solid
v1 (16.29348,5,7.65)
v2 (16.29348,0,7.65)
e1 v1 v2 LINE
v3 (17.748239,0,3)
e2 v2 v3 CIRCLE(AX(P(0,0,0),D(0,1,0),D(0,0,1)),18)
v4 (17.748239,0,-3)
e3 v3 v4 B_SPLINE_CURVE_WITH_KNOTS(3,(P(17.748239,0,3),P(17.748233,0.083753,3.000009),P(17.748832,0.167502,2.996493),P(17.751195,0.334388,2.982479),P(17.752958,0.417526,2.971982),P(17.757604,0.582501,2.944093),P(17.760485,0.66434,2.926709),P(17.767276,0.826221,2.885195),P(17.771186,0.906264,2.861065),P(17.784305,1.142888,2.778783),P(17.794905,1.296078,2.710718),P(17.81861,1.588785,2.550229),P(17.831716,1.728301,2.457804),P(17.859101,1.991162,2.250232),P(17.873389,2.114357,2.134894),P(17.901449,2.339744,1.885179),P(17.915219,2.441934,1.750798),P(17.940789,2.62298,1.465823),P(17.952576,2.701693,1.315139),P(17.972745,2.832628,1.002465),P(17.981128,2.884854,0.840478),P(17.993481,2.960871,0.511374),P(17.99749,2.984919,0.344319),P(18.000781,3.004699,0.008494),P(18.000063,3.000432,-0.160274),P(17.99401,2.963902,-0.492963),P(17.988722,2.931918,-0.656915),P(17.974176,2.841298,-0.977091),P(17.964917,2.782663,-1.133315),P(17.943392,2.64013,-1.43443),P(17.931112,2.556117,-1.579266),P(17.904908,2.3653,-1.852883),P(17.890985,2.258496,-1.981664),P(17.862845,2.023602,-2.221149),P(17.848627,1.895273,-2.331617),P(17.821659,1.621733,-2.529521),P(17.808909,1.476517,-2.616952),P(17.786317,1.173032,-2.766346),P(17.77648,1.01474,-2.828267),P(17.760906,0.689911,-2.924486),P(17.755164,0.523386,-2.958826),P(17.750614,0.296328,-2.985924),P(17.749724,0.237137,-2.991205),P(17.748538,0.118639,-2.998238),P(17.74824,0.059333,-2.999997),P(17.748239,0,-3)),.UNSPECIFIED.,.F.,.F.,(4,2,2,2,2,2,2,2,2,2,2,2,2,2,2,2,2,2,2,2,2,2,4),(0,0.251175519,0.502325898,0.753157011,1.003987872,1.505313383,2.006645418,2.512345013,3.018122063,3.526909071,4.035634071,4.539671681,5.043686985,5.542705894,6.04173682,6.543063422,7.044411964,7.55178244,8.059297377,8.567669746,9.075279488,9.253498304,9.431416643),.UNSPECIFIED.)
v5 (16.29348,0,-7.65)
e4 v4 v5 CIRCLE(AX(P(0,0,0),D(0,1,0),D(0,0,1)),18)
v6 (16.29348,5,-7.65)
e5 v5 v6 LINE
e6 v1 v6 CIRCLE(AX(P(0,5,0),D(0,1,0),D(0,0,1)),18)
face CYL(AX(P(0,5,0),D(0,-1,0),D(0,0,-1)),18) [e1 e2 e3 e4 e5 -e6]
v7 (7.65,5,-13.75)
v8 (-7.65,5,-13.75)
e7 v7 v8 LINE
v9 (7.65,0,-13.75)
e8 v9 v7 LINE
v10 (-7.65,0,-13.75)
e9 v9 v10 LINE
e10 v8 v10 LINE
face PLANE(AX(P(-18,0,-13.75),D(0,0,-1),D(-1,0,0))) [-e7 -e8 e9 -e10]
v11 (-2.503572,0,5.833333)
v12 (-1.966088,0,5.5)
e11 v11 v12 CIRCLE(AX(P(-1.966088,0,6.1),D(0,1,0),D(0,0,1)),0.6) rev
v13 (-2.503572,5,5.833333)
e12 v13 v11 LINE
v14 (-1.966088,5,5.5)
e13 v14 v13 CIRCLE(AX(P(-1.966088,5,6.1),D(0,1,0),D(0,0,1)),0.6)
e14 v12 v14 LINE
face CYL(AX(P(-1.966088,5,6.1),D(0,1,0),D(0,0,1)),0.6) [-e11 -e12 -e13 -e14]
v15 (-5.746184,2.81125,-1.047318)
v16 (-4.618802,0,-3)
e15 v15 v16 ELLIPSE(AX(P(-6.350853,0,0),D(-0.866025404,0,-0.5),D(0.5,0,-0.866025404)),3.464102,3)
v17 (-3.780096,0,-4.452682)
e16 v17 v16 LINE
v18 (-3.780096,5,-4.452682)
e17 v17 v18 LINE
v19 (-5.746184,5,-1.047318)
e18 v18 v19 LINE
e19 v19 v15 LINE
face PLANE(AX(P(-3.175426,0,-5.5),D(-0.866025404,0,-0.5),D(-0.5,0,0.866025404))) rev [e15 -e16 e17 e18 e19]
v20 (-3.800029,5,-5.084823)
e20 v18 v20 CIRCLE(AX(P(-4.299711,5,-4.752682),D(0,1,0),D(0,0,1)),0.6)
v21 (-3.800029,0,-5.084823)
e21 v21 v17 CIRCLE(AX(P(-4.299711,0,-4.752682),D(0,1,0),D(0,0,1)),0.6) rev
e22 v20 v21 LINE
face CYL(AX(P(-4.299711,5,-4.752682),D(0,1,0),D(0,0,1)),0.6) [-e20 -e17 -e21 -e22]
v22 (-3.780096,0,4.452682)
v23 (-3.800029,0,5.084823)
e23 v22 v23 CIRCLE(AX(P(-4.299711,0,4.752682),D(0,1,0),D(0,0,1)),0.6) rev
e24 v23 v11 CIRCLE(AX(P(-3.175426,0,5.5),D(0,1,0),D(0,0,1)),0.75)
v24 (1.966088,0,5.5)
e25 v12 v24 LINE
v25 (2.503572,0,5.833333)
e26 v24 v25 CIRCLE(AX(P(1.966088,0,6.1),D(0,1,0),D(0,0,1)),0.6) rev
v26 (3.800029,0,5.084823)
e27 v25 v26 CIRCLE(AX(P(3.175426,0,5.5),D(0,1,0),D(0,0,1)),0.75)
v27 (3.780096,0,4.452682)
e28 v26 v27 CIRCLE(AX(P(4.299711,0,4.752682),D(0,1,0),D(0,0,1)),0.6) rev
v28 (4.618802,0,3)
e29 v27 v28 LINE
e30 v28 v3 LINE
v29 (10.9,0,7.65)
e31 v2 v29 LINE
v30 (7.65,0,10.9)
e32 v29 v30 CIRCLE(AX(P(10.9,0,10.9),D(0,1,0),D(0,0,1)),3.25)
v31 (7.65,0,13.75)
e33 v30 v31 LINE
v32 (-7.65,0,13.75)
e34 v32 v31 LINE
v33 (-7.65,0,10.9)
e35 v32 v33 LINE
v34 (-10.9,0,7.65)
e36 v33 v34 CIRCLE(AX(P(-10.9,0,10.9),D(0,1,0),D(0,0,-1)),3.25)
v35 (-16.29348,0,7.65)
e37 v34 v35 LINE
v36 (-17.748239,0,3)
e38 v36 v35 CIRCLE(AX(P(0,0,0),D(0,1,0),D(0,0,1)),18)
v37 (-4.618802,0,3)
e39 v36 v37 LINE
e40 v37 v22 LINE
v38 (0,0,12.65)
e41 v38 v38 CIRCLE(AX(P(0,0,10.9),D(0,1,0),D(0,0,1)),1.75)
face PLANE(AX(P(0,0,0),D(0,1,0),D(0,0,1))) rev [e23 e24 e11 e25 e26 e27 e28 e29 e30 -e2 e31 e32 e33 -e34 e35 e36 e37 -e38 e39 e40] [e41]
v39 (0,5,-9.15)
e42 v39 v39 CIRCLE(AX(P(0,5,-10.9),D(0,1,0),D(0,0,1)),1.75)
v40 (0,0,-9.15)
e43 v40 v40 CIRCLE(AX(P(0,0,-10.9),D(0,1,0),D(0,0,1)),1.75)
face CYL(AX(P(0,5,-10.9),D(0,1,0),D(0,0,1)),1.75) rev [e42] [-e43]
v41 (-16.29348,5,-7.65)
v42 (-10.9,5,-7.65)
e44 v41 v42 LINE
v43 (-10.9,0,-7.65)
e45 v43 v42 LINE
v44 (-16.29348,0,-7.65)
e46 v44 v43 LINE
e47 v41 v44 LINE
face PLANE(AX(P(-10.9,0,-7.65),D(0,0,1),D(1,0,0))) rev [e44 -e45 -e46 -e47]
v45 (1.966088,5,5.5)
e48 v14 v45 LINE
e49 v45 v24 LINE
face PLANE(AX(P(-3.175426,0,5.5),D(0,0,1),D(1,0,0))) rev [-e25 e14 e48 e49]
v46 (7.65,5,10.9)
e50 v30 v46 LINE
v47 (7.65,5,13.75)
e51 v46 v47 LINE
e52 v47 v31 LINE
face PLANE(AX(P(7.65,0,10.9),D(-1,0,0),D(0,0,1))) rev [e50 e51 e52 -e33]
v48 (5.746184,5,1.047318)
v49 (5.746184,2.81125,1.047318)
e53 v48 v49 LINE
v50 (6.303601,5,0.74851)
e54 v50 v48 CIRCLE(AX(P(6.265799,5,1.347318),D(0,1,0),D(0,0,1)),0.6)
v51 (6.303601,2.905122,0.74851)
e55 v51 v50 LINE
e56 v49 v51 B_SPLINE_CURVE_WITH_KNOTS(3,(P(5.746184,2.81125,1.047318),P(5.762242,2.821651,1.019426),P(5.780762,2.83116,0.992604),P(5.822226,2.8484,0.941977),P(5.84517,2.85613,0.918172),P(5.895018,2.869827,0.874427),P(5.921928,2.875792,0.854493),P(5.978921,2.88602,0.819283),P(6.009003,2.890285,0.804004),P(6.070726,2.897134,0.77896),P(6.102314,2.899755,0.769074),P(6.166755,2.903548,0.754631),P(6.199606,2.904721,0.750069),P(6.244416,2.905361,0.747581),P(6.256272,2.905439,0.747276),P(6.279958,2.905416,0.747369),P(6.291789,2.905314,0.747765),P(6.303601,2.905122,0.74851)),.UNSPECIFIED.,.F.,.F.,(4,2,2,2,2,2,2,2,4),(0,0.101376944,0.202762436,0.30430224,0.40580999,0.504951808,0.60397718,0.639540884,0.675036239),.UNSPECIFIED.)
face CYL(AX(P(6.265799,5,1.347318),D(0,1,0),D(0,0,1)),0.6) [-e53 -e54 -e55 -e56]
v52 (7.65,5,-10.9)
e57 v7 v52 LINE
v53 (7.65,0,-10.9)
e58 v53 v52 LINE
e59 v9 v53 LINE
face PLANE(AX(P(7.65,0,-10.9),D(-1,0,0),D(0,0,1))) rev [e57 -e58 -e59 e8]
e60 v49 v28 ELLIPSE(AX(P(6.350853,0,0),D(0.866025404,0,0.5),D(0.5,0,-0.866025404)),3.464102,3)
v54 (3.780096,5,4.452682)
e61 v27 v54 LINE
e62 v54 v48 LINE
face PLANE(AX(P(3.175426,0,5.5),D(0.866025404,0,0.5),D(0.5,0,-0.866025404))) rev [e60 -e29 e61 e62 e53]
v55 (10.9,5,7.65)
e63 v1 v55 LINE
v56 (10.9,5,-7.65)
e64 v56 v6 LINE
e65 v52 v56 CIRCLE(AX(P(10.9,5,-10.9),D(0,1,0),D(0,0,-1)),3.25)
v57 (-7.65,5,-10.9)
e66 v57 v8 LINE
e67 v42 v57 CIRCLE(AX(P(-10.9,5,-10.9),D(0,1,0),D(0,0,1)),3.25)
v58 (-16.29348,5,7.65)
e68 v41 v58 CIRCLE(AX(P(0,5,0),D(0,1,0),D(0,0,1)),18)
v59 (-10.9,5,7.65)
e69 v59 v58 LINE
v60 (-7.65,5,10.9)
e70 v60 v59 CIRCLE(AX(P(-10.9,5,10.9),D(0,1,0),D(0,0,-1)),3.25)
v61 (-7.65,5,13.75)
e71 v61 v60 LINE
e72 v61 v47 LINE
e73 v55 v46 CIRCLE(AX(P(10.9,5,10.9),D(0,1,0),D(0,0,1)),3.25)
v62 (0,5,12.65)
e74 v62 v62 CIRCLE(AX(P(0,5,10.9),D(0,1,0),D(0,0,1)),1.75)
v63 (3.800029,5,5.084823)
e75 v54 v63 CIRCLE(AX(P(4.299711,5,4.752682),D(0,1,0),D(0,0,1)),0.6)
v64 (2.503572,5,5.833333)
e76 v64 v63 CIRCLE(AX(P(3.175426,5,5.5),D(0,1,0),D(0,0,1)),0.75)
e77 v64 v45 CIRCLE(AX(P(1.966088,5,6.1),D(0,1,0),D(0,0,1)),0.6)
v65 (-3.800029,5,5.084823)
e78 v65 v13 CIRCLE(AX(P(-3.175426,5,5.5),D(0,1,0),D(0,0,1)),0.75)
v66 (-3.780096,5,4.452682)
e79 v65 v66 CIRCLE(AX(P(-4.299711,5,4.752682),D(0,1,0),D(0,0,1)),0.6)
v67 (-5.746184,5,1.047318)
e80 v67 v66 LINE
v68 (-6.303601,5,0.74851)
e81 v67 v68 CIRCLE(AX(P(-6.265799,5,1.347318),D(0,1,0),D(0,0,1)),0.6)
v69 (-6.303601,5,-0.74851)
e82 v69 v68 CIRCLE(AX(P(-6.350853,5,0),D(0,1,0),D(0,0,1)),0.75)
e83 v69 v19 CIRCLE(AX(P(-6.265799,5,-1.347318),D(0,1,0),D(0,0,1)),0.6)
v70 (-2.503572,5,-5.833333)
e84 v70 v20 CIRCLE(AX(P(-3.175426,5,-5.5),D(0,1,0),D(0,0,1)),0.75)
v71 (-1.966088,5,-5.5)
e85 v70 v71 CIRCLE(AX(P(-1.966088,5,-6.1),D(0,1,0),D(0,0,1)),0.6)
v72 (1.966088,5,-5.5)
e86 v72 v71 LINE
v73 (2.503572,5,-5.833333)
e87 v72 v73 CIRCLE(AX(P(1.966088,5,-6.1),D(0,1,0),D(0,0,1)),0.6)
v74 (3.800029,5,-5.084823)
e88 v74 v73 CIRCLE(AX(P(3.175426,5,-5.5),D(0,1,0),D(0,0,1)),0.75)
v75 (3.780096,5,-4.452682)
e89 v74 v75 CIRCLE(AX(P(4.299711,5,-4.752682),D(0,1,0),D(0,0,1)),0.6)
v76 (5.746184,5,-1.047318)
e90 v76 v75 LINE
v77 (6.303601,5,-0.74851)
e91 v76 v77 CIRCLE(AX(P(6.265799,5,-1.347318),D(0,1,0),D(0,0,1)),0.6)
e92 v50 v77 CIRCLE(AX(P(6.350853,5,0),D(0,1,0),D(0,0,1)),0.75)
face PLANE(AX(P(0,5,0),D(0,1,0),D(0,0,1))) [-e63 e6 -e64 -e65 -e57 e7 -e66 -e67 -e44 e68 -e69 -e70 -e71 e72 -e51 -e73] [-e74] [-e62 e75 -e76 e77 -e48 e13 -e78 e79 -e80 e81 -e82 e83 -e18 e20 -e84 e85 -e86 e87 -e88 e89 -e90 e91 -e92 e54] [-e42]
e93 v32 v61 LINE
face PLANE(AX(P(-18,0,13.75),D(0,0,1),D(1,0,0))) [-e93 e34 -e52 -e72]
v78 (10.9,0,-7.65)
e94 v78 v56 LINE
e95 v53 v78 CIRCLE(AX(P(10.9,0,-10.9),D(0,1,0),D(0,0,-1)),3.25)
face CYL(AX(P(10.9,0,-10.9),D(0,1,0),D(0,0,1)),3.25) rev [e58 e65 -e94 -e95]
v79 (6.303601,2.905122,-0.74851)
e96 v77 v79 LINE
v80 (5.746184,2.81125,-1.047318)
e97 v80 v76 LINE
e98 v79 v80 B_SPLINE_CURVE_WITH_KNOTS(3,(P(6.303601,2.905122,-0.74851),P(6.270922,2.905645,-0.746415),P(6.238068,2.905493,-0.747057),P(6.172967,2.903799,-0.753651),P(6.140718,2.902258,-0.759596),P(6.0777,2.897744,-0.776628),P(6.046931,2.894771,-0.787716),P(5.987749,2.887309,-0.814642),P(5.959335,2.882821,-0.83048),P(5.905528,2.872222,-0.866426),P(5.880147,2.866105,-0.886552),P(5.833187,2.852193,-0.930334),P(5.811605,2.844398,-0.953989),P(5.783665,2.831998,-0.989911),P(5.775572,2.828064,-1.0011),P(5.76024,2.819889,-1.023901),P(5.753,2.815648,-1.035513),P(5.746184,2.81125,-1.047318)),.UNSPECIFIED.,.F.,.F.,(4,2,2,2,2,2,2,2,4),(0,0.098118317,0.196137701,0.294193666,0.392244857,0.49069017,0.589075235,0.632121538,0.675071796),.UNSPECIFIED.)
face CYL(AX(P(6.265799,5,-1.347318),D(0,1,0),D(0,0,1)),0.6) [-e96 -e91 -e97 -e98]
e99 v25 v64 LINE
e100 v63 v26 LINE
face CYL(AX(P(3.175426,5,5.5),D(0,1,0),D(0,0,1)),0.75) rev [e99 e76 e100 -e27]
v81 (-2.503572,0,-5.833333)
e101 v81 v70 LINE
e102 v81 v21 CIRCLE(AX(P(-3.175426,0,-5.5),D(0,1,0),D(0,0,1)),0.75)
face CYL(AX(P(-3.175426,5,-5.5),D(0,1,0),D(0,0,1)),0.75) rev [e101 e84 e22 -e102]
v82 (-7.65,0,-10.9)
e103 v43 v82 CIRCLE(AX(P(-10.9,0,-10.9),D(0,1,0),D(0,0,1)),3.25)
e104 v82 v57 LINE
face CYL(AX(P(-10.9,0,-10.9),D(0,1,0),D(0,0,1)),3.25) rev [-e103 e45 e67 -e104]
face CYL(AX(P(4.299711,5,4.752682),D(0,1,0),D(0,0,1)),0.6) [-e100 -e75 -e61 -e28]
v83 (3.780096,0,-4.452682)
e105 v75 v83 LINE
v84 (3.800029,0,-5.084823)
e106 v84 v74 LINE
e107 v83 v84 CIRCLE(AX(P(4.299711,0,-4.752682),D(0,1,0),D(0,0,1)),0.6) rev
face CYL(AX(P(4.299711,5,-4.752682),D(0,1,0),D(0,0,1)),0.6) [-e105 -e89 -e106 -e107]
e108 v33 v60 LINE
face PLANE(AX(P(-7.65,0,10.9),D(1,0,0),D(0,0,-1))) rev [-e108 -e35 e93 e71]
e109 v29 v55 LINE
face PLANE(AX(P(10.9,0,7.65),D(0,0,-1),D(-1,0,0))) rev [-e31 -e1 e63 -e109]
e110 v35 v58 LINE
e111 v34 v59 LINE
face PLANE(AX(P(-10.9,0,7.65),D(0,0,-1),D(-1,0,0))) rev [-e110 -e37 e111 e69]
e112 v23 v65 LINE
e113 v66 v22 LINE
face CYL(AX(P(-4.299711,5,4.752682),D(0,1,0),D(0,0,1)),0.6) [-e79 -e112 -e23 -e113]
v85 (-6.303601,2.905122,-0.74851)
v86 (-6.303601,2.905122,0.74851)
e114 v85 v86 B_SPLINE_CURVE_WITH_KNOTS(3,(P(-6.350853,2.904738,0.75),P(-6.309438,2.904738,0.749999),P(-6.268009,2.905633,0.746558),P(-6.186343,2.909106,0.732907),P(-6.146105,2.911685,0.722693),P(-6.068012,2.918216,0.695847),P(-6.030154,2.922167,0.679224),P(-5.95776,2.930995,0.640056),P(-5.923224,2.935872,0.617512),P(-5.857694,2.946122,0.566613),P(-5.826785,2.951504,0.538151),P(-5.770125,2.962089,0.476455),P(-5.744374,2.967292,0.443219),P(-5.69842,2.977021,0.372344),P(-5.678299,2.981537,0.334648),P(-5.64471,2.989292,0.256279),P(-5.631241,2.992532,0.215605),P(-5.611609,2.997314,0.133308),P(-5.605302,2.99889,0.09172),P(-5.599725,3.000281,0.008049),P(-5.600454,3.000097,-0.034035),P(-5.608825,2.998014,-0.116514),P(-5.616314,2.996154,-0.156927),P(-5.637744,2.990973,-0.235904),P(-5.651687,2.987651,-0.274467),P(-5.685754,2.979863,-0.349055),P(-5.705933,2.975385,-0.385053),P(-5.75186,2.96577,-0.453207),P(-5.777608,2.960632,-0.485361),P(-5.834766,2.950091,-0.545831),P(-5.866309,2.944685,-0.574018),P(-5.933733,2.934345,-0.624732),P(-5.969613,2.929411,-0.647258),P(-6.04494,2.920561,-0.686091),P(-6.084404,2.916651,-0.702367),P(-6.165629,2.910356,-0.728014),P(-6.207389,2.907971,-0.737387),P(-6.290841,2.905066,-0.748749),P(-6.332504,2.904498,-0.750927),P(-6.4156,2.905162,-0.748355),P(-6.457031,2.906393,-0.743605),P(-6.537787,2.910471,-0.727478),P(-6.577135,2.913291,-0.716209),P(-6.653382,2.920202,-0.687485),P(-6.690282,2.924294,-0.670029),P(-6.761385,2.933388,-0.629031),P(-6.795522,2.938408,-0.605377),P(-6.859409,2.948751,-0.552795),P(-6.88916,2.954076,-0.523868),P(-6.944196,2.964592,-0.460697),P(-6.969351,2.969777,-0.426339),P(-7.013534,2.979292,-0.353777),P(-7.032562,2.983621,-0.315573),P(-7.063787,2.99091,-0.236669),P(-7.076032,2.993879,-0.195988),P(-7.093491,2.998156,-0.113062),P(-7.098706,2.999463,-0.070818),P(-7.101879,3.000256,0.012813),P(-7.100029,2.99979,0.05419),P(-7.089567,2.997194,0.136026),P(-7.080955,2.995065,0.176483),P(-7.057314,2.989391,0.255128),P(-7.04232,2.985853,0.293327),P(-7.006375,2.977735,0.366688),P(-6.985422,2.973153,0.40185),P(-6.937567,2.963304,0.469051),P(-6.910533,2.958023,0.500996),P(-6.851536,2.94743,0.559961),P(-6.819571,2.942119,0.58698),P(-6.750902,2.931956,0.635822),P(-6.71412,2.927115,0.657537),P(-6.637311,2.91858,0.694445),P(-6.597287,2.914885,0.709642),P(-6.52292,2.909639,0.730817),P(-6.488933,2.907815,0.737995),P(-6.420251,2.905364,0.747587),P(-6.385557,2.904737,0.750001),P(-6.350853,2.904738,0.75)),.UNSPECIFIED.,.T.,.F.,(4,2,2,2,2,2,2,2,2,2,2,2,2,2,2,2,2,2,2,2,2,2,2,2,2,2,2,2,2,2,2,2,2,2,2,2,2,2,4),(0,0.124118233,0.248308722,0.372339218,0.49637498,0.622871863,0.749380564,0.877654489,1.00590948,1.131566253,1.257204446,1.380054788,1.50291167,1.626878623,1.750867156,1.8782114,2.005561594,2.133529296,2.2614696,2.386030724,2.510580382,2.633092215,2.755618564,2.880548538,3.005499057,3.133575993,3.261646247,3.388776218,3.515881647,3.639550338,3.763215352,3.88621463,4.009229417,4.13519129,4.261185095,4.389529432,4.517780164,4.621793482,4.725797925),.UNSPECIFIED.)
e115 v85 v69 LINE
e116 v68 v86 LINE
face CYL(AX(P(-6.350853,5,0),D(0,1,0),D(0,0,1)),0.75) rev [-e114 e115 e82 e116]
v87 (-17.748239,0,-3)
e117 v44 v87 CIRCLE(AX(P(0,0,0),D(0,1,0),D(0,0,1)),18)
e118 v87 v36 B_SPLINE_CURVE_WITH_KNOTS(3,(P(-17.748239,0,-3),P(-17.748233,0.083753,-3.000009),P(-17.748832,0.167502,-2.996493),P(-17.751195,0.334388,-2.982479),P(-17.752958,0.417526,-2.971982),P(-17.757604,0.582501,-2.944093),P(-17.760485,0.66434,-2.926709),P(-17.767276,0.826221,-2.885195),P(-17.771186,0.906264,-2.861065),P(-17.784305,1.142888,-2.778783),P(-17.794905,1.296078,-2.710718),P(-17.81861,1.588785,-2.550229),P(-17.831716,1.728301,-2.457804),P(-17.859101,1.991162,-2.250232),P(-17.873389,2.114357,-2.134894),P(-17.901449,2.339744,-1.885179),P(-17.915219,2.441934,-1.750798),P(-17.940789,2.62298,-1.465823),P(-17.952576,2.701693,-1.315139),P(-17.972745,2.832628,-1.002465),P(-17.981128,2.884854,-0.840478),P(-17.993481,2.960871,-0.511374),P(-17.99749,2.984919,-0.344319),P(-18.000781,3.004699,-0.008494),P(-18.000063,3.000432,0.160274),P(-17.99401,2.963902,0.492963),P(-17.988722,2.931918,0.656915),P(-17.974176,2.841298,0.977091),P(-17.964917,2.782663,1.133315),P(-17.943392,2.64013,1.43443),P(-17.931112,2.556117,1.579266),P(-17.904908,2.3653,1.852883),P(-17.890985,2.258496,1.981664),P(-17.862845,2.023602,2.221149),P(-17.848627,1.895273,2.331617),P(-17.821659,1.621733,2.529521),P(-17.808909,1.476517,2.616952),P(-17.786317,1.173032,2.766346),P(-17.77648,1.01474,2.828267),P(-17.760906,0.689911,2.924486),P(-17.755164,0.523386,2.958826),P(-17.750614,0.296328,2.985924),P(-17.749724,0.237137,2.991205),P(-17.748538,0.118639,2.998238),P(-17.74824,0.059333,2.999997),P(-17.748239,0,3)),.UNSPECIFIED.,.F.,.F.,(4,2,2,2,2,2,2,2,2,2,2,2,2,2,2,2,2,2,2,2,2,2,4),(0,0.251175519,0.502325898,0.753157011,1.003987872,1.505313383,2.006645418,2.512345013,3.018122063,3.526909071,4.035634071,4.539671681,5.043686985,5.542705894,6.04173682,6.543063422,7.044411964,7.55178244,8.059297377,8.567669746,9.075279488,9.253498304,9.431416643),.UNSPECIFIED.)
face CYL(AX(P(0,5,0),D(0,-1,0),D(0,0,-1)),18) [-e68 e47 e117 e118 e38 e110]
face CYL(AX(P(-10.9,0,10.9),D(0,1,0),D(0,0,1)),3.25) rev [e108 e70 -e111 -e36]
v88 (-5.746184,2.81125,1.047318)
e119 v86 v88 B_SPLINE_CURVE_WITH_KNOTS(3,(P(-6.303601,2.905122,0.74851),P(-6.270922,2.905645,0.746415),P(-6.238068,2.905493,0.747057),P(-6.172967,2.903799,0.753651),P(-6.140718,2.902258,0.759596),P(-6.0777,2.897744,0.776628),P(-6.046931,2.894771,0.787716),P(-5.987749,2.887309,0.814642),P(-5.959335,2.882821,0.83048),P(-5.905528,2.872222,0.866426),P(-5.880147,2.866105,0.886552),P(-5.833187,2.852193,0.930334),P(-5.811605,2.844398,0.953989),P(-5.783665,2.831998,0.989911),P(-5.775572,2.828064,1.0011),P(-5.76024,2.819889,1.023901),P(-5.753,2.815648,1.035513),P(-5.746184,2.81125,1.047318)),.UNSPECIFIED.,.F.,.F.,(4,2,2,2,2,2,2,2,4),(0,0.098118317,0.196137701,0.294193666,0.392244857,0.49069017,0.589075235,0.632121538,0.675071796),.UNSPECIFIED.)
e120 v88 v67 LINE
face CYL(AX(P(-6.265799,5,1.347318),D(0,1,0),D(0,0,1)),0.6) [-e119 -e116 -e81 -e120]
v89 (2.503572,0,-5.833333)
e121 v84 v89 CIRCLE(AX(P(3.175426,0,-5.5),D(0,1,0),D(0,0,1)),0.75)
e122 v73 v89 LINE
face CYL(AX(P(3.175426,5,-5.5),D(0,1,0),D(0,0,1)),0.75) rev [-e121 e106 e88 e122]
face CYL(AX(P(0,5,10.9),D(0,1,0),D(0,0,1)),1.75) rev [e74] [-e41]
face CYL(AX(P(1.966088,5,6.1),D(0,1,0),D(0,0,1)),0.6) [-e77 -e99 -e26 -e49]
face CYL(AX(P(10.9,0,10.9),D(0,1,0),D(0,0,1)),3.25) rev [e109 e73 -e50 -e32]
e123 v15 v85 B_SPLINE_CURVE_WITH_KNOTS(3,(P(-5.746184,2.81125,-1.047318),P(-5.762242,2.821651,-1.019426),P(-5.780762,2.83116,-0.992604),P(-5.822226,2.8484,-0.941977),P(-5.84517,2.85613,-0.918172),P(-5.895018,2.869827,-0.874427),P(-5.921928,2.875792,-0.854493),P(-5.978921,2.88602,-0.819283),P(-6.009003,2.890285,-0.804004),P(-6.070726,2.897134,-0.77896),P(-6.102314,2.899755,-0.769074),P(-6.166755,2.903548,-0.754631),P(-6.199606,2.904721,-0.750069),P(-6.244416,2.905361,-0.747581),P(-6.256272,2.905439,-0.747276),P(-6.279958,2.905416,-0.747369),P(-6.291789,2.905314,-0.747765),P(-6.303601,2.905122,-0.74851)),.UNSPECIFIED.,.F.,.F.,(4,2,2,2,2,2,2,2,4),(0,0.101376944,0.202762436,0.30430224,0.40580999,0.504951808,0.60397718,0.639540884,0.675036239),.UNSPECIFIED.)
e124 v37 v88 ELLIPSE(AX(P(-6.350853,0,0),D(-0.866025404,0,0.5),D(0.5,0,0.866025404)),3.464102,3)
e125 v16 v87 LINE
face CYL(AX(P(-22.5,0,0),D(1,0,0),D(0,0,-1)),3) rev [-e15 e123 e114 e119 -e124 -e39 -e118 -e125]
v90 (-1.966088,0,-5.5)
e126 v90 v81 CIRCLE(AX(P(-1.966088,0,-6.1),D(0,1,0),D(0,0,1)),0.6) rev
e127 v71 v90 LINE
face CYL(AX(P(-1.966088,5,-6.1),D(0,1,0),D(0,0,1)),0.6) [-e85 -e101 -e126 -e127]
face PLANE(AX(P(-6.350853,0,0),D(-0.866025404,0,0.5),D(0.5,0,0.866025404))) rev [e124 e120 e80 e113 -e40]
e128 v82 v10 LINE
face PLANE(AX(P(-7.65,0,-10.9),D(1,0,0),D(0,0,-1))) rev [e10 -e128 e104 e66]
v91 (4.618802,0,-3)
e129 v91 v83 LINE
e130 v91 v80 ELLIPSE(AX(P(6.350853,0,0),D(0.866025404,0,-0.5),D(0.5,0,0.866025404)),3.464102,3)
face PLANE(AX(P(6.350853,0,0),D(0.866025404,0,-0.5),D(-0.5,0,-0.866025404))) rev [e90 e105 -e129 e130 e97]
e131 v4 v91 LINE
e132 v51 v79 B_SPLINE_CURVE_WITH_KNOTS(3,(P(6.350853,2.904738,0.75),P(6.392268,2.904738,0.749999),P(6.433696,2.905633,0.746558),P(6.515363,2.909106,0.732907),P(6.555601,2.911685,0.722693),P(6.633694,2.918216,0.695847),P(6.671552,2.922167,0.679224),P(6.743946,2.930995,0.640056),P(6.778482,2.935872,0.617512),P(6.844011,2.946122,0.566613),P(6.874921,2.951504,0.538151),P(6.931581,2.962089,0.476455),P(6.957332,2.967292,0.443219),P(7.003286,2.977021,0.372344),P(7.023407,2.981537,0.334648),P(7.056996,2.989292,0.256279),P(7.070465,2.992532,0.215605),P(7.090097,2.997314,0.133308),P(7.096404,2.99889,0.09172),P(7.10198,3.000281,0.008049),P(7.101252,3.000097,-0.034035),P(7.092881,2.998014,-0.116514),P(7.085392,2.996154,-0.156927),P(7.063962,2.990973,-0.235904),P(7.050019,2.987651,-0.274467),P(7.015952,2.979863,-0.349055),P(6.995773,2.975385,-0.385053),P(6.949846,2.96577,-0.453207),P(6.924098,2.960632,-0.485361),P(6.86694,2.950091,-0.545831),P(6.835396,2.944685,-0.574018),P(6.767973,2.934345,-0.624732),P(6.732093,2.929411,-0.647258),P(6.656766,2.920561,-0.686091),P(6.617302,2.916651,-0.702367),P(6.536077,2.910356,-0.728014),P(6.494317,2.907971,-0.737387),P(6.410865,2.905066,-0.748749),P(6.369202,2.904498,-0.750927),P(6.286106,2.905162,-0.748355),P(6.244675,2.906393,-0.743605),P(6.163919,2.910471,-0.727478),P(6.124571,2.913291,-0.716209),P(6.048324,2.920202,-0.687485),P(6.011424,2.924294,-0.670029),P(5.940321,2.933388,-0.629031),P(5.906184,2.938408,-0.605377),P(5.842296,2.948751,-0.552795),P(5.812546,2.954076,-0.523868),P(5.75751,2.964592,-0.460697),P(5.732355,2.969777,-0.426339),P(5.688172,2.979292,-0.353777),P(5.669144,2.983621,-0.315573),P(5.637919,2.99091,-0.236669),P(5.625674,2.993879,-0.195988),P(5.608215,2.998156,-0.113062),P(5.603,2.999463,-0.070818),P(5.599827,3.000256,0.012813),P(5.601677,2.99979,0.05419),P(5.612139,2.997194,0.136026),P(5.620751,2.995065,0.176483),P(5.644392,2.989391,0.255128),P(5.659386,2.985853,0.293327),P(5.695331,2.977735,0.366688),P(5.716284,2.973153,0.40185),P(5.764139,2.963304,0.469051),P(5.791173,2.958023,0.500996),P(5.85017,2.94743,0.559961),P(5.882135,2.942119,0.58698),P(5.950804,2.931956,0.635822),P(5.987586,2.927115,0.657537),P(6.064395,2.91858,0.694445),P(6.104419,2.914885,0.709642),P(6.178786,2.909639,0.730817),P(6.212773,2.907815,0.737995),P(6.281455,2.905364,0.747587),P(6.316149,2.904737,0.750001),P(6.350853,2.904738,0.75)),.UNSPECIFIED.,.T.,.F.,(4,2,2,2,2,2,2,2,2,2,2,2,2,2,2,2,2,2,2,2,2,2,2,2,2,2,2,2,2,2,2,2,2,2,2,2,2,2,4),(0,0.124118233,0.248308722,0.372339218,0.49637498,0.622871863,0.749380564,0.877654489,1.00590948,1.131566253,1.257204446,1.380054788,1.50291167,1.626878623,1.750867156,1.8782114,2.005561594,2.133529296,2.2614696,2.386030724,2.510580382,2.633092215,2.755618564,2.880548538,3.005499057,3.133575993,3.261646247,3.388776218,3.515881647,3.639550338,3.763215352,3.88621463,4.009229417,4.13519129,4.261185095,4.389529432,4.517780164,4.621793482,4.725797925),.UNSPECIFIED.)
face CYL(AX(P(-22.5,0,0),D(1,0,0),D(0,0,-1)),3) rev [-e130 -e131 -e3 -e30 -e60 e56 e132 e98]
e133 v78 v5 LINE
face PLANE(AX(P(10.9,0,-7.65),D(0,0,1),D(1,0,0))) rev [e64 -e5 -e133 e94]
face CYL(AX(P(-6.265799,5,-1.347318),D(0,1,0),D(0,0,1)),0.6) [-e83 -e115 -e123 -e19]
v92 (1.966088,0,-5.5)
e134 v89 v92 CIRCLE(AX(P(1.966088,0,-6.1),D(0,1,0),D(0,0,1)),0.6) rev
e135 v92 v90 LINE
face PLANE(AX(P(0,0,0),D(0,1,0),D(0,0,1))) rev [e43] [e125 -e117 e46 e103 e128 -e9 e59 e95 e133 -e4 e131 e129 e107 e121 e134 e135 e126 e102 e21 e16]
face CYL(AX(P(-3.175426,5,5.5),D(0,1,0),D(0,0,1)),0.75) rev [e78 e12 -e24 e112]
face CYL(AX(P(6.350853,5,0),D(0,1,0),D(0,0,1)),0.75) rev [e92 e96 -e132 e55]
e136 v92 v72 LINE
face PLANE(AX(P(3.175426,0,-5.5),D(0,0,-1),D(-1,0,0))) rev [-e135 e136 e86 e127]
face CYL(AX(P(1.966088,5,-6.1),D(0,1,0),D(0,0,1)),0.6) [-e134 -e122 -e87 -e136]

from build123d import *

# Parameters (mm, degrees)
SKIZZE1_R                            = 18
AUFSATZ_LINEAR_AUSTRAGEN1_DEPTH      = 5
SCHNITT_LINEAR_AUSTRAGEN1_DEPTH      = 26.942243542
SCHNITT_LINEAR_AUSTRAGEN1_DEPTH_BACK = 26.942243542
SKIZZE2_OUTSIDE_W                    = 48.232
SKIZZE2_OUTSIDE_H                    = 48.232
SKIZZE2_OUTSIDE_W_2                  = 36
SKIZZE2_OUTSIDE_H_2                  = 27.5
F_3_5_3_5_DURCHMESSER_BOHRUNG1_D     = 3.5
SCHNITT_LINEAR_AUSTRAGEN2_DEPTH      = 24.196174254
SCHNITT_LINEAR_AUSTRAGEN3_DEPTH      = 24.196174254
SKIZZE7_R                            = 3
SCHNITT_LINEAR_AUSTRAGEN4_DEPTH      = 22.5
F_1_5_1_5_DURCHMESSER_BOHRUNG1_D     = 1.5
VERRUNDUNG1_R                        = 0.6


with BuildPart() as part:
    # Skizze1 → Aufsatz-Linear austragen1 (new body)
    with BuildSketch(Plane(origin=(0, 0, 0), x_dir=(1, 0, 0), z_dir=(0, 1, 0))):
        with Locations(Location((0, 0, 0), (0, 0, 270))):
            Circle(SKIZZE1_R)
    extrude(amount=AUFSATZ_LINEAR_AUSTRAGEN1_DEPTH)

    # Skizze2 outside → Schnitt-Linear austragen1 (cut, two sides: drawn at the far end of the back side and taken through both)
    with BuildSketch(Plane(origin=(0, 5, 0), x_dir=(1, 0, 0), z_dir=(0, 1, 0)).offset(-SCHNITT_LINEAR_AUSTRAGEN1_DEPTH_BACK)):
        Rectangle(SKIZZE2_OUTSIDE_W, SKIZZE2_OUTSIDE_H)
        Rectangle(SKIZZE2_OUTSIDE_W_2, SKIZZE2_OUTSIDE_H_2, mode=Mode.SUBTRACT)
    extrude(amount=SCHNITT_LINEAR_AUSTRAGEN1_DEPTH + SCHNITT_LINEAR_AUSTRAGEN1_DEPTH_BACK, mode=Mode.SUBTRACT)

    # Ø3.5 (3.5) Durchmesser Bohrung1 (through all)
    with Locations(Plane(origin=(0, 5, 0), x_dir=(1, 0, 0), z_dir=(0, 1, 0))):
        with Locations((0, 10.9), (0, -10.9)):
            Hole(F_3_5_3_5_DURCHMESSER_BOHRUNG1_D / 2)

    # Skizze5 → Schnitt-Linear austragen2 (cut, through all)
    with BuildSketch(Plane(origin=(0, 5, 0), x_dir=(1, 0, 0), z_dir=(0, 1, 0))):
        with BuildLine():
            Line((-10.9, 7.65), (-17.888484908, 7.65))
            Line((-17.888484908, 7.65), (-17.888484908, 14.15))
            Line((-17.888484908, 14.15), (-7.65, 14.15))
            Line((-7.65, 14.15), (-7.65, 10.9))
            ThreePointArc((-7.65, 10.9), (-8.601902961, 8.601902961), (-10.9, 7.65))
        make_face()
        with BuildLine():
            Line((17.888484908, 14.15), (17.888484908, 7.65))
            Line((17.888484908, 7.65), (10.9, 7.65))
            ThreePointArc((10.9, 7.65), (8.601902961, 8.601902961), (7.65, 10.9))
            Line((7.65, 10.9), (7.65, 14.15))
            Line((7.65, 14.15), (17.888484908, 14.15))
        make_face()
        with BuildLine():
            Line((-17.888484908, -14.15), (-17.888484908, -7.65))
            Line((-17.888484908, -7.65), (-10.9, -7.65))
            ThreePointArc((-10.9, -7.65), (-8.601902961, -8.601902961), (-7.65, -10.9))
            Line((-7.65, -10.9), (-7.65, -14.15))
            Line((-7.65, -14.15), (-17.888484908, -14.15))
        make_face()
        with BuildLine():
            Line((10.9, -7.65), (17.888484908, -7.65))
            Line((17.888484908, -7.65), (17.888484908, -14.15))
            Line((17.888484908, -14.15), (7.65, -14.15))
            Line((7.65, -14.15), (7.65, -10.9))
            ThreePointArc((7.65, -10.9), (8.601902961, -8.601902961), (10.9, -7.65))
        make_face()
    extrude(amount=-SCHNITT_LINEAR_AUSTRAGEN2_DEPTH, mode=Mode.SUBTRACT)

    # Skizze6 → Schnitt-Linear austragen3 (cut, through all)
    with BuildSketch(Plane(origin=(0, 5, 0), x_dir=(1, 0, 0), z_dir=(0, 1, 0))):
        Polygon((6.350852961, 0), (3.175426481, 5.5), (-3.175426481, 5.5), (-6.350852961, 0), (-3.175426481, -5.5), (3.175426481, -5.5), align=None)
    extrude(amount=-SCHNITT_LINEAR_AUSTRAGEN3_DEPTH, mode=Mode.SUBTRACT)

    # Skizze7 → Schnitt-Linear austragen4 (cut, symmetric)
    with BuildSketch(Plane(origin=(0, 0, 0), x_dir=(0, 0, -1), z_dir=(1, 0, 0))):
        Circle(SKIZZE7_R)
    extrude(amount=SCHNITT_LINEAR_AUSTRAGEN4_DEPTH, both=True, mode=Mode.SUBTRACT)

    # Ø1.5 (1.5) Durchmesser Bohrung1 (through all)
    with Locations(Plane(origin=(0, 5, 0), x_dir=(1, 0, 0), z_dir=(0, 1, 0))):
        with Locations((3.175426481, 5.5), (-3.175426481, 5.5), (-6.350852961, 0), (-3.175426481, -5.5), (3.175426481, -5.5), (6.350852961, 0)):
            Hole(F_1_5_1_5_DURCHMESSER_BOHRUNG1_D / 2)

    # Verrundung1
    # the kernel refuses this fillet: 0.6 mm, written as the material it takes off along each edge
    with BuildSketch(Plane(origin=(-5.975852961, 6.148346656, -0.649519053), x_dir=(0.4999999999999993, 0, -0.8660254037844392), z_dir=(0, -1, 0))) as verrundung1_piece_1:
        with BuildLine():
            CenterArc((0.459338662, -0.6), VERRUNDUNG1_R, 90, 63.612200035)
            ThreePointArc((-0.078145188, -0.333333333), (-0.019797593, -0.171185412), (0, 0))
            Line((0, 0), (0.459338662, 0))
        make_face()
    extrude(amount=4.367849683, mode=Mode.SUBTRACT)
    with BuildSketch(Plane(origin=(-5.975852961, 6.148346656, 0.649519053), x_dir=(0.5000000000000006, 0, 0.8660254037844383), z_dir=(0, -1, 0)), Plane(origin=(5.975852961, 6.148346656, -0.649519053), x_dir=(-0.5000000000000003, 0, -0.8660254037844385), z_dir=(0, -1, 0))) as verrundung1_piece_2:
        with BuildLine():
            CenterArc((0.459338662, 0.6), VERRUNDUNG1_R, 206.387799965, 63.612200035)
            ThreePointArc((-0.078145188, 0.333333333), (-0.019797593, 0.171185412), (0, 0))
            Line((0, 0), (0.459338662, 0))
        make_face()
    extrude(amount=4.367849683, mode=Mode.SUBTRACT)
    with BuildSketch(Plane(origin=(-3.550426481, 6.148346656, 4.850480947), x_dir=(-0.49999999999999917, 0, -0.866025403784439), z_dir=(0, -1, 0)), Plane(origin=(3.550426481, 6.148346656, -4.850480947), x_dir=(0.5000000000000006, 0, 0.8660254037844383), z_dir=(0, -1, 0))) as verrundung1_piece_3:
        with BuildLine():
            CenterArc((0.459338662, -0.6), VERRUNDUNG1_R, 90, 63.612200058)
            ThreePointArc((-0.078145188, -0.333333334), (-0.019797593, -0.171185412), (0, 0))
            Line((0, 0), (0.459338662, 0))
        make_face()
    extrude(amount=7.296693312, mode=Mode.SUBTRACT)
    with BuildSketch(Plane(origin=(-2.425426481, 6.148346656, 5.5), x_dir=(-0.22824721632736633, 0, 0.9736032088272966), z_dir=(0, -1, 0)), Plane(origin=(2.425426481, 6.148346656, -5.5), x_dir=(0.22824721632736567, 0, -0.9736032088272967), z_dir=(0, -1, 0))) as verrundung1_piece_4:
        with BuildLine():
            CenterArc((0.479319154, -0.584161925), VERRUNDUNG1_R, 103.193899981, 63.612200039)
            Line((-0.104842771, -0.447213595), (0, 0))
            ThreePointArc((0, 0), (0.171185412, -0.019797593), (0.342370824, 0))
        make_face()
    extrude(amount=7.296693311, mode=Mode.SUBTRACT)
    with BuildSketch(Plane(origin=(2.425426481, 6.148346656, 5.5), x_dir=(-1, 0, 0), z_dir=(0, -1, 0)), Plane(origin=(-2.425426481, 6.148346656, -5.5), x_dir=(1, 0, 0), z_dir=(0, -1, 0))) as verrundung1_piece_5:
        with BuildLine():
            CenterArc((0.459338662, -0.6), VERRUNDUNG1_R, 90, 63.612200039)
            ThreePointArc((-0.078145188, -0.333333333), (-0.019797593, -0.171185412), (0, 0))
            Line((0, 0), (0.459338662, 0))
        make_face()
    extrude(amount=7.296693311, mode=Mode.SUBTRACT)
    with BuildSketch(Plane(origin=(3.550426481, 6.148346656, 4.850480947), x_dir=(0.7290415041794372, 0, 0.6844694917845379), z_dir=(0, -1, 0)), Plane(origin=(-3.550426481, 6.148346656, -4.850480947), x_dir=(-0.729041504179436, 0, -0.6844694917845393), z_dir=(0, -1, 0))) as verrundung1_piece_6:
        with BuildLine():
            CenterArc((0.479319154, -0.584161925), VERRUNDUNG1_R, 103.193899986, 63.612200058)
            Line((-0.104842771, -0.447213596), (0, 0))
            ThreePointArc((0, 0), (0.171185412, -0.019797593), (0.342370825, 0))
        make_face()
    extrude(amount=7.296693312, mode=Mode.SUBTRACT)
    with BuildSketch(Plane(origin=(5.975852961, 6.148346656, 0.649519053), x_dir=(0.9572887202373949, 0, 0.28913371665416454), z_dir=(0, -1, 0))) as verrundung1_piece_7:
        with BuildLine():
            CenterArc((0.479319154, 0.584161925), VERRUNDUNG1_R, 193.193899985, 63.612200035)
            Line((-0.104842771, 0.447213595), (0, 0))
            ThreePointArc((0, 0), (0.171185412, 0.019797593), (0.342370824, 0))
        make_face()
    extrude(amount=4.367849683, mode=Mode.SUBTRACT)


solid = part.part
